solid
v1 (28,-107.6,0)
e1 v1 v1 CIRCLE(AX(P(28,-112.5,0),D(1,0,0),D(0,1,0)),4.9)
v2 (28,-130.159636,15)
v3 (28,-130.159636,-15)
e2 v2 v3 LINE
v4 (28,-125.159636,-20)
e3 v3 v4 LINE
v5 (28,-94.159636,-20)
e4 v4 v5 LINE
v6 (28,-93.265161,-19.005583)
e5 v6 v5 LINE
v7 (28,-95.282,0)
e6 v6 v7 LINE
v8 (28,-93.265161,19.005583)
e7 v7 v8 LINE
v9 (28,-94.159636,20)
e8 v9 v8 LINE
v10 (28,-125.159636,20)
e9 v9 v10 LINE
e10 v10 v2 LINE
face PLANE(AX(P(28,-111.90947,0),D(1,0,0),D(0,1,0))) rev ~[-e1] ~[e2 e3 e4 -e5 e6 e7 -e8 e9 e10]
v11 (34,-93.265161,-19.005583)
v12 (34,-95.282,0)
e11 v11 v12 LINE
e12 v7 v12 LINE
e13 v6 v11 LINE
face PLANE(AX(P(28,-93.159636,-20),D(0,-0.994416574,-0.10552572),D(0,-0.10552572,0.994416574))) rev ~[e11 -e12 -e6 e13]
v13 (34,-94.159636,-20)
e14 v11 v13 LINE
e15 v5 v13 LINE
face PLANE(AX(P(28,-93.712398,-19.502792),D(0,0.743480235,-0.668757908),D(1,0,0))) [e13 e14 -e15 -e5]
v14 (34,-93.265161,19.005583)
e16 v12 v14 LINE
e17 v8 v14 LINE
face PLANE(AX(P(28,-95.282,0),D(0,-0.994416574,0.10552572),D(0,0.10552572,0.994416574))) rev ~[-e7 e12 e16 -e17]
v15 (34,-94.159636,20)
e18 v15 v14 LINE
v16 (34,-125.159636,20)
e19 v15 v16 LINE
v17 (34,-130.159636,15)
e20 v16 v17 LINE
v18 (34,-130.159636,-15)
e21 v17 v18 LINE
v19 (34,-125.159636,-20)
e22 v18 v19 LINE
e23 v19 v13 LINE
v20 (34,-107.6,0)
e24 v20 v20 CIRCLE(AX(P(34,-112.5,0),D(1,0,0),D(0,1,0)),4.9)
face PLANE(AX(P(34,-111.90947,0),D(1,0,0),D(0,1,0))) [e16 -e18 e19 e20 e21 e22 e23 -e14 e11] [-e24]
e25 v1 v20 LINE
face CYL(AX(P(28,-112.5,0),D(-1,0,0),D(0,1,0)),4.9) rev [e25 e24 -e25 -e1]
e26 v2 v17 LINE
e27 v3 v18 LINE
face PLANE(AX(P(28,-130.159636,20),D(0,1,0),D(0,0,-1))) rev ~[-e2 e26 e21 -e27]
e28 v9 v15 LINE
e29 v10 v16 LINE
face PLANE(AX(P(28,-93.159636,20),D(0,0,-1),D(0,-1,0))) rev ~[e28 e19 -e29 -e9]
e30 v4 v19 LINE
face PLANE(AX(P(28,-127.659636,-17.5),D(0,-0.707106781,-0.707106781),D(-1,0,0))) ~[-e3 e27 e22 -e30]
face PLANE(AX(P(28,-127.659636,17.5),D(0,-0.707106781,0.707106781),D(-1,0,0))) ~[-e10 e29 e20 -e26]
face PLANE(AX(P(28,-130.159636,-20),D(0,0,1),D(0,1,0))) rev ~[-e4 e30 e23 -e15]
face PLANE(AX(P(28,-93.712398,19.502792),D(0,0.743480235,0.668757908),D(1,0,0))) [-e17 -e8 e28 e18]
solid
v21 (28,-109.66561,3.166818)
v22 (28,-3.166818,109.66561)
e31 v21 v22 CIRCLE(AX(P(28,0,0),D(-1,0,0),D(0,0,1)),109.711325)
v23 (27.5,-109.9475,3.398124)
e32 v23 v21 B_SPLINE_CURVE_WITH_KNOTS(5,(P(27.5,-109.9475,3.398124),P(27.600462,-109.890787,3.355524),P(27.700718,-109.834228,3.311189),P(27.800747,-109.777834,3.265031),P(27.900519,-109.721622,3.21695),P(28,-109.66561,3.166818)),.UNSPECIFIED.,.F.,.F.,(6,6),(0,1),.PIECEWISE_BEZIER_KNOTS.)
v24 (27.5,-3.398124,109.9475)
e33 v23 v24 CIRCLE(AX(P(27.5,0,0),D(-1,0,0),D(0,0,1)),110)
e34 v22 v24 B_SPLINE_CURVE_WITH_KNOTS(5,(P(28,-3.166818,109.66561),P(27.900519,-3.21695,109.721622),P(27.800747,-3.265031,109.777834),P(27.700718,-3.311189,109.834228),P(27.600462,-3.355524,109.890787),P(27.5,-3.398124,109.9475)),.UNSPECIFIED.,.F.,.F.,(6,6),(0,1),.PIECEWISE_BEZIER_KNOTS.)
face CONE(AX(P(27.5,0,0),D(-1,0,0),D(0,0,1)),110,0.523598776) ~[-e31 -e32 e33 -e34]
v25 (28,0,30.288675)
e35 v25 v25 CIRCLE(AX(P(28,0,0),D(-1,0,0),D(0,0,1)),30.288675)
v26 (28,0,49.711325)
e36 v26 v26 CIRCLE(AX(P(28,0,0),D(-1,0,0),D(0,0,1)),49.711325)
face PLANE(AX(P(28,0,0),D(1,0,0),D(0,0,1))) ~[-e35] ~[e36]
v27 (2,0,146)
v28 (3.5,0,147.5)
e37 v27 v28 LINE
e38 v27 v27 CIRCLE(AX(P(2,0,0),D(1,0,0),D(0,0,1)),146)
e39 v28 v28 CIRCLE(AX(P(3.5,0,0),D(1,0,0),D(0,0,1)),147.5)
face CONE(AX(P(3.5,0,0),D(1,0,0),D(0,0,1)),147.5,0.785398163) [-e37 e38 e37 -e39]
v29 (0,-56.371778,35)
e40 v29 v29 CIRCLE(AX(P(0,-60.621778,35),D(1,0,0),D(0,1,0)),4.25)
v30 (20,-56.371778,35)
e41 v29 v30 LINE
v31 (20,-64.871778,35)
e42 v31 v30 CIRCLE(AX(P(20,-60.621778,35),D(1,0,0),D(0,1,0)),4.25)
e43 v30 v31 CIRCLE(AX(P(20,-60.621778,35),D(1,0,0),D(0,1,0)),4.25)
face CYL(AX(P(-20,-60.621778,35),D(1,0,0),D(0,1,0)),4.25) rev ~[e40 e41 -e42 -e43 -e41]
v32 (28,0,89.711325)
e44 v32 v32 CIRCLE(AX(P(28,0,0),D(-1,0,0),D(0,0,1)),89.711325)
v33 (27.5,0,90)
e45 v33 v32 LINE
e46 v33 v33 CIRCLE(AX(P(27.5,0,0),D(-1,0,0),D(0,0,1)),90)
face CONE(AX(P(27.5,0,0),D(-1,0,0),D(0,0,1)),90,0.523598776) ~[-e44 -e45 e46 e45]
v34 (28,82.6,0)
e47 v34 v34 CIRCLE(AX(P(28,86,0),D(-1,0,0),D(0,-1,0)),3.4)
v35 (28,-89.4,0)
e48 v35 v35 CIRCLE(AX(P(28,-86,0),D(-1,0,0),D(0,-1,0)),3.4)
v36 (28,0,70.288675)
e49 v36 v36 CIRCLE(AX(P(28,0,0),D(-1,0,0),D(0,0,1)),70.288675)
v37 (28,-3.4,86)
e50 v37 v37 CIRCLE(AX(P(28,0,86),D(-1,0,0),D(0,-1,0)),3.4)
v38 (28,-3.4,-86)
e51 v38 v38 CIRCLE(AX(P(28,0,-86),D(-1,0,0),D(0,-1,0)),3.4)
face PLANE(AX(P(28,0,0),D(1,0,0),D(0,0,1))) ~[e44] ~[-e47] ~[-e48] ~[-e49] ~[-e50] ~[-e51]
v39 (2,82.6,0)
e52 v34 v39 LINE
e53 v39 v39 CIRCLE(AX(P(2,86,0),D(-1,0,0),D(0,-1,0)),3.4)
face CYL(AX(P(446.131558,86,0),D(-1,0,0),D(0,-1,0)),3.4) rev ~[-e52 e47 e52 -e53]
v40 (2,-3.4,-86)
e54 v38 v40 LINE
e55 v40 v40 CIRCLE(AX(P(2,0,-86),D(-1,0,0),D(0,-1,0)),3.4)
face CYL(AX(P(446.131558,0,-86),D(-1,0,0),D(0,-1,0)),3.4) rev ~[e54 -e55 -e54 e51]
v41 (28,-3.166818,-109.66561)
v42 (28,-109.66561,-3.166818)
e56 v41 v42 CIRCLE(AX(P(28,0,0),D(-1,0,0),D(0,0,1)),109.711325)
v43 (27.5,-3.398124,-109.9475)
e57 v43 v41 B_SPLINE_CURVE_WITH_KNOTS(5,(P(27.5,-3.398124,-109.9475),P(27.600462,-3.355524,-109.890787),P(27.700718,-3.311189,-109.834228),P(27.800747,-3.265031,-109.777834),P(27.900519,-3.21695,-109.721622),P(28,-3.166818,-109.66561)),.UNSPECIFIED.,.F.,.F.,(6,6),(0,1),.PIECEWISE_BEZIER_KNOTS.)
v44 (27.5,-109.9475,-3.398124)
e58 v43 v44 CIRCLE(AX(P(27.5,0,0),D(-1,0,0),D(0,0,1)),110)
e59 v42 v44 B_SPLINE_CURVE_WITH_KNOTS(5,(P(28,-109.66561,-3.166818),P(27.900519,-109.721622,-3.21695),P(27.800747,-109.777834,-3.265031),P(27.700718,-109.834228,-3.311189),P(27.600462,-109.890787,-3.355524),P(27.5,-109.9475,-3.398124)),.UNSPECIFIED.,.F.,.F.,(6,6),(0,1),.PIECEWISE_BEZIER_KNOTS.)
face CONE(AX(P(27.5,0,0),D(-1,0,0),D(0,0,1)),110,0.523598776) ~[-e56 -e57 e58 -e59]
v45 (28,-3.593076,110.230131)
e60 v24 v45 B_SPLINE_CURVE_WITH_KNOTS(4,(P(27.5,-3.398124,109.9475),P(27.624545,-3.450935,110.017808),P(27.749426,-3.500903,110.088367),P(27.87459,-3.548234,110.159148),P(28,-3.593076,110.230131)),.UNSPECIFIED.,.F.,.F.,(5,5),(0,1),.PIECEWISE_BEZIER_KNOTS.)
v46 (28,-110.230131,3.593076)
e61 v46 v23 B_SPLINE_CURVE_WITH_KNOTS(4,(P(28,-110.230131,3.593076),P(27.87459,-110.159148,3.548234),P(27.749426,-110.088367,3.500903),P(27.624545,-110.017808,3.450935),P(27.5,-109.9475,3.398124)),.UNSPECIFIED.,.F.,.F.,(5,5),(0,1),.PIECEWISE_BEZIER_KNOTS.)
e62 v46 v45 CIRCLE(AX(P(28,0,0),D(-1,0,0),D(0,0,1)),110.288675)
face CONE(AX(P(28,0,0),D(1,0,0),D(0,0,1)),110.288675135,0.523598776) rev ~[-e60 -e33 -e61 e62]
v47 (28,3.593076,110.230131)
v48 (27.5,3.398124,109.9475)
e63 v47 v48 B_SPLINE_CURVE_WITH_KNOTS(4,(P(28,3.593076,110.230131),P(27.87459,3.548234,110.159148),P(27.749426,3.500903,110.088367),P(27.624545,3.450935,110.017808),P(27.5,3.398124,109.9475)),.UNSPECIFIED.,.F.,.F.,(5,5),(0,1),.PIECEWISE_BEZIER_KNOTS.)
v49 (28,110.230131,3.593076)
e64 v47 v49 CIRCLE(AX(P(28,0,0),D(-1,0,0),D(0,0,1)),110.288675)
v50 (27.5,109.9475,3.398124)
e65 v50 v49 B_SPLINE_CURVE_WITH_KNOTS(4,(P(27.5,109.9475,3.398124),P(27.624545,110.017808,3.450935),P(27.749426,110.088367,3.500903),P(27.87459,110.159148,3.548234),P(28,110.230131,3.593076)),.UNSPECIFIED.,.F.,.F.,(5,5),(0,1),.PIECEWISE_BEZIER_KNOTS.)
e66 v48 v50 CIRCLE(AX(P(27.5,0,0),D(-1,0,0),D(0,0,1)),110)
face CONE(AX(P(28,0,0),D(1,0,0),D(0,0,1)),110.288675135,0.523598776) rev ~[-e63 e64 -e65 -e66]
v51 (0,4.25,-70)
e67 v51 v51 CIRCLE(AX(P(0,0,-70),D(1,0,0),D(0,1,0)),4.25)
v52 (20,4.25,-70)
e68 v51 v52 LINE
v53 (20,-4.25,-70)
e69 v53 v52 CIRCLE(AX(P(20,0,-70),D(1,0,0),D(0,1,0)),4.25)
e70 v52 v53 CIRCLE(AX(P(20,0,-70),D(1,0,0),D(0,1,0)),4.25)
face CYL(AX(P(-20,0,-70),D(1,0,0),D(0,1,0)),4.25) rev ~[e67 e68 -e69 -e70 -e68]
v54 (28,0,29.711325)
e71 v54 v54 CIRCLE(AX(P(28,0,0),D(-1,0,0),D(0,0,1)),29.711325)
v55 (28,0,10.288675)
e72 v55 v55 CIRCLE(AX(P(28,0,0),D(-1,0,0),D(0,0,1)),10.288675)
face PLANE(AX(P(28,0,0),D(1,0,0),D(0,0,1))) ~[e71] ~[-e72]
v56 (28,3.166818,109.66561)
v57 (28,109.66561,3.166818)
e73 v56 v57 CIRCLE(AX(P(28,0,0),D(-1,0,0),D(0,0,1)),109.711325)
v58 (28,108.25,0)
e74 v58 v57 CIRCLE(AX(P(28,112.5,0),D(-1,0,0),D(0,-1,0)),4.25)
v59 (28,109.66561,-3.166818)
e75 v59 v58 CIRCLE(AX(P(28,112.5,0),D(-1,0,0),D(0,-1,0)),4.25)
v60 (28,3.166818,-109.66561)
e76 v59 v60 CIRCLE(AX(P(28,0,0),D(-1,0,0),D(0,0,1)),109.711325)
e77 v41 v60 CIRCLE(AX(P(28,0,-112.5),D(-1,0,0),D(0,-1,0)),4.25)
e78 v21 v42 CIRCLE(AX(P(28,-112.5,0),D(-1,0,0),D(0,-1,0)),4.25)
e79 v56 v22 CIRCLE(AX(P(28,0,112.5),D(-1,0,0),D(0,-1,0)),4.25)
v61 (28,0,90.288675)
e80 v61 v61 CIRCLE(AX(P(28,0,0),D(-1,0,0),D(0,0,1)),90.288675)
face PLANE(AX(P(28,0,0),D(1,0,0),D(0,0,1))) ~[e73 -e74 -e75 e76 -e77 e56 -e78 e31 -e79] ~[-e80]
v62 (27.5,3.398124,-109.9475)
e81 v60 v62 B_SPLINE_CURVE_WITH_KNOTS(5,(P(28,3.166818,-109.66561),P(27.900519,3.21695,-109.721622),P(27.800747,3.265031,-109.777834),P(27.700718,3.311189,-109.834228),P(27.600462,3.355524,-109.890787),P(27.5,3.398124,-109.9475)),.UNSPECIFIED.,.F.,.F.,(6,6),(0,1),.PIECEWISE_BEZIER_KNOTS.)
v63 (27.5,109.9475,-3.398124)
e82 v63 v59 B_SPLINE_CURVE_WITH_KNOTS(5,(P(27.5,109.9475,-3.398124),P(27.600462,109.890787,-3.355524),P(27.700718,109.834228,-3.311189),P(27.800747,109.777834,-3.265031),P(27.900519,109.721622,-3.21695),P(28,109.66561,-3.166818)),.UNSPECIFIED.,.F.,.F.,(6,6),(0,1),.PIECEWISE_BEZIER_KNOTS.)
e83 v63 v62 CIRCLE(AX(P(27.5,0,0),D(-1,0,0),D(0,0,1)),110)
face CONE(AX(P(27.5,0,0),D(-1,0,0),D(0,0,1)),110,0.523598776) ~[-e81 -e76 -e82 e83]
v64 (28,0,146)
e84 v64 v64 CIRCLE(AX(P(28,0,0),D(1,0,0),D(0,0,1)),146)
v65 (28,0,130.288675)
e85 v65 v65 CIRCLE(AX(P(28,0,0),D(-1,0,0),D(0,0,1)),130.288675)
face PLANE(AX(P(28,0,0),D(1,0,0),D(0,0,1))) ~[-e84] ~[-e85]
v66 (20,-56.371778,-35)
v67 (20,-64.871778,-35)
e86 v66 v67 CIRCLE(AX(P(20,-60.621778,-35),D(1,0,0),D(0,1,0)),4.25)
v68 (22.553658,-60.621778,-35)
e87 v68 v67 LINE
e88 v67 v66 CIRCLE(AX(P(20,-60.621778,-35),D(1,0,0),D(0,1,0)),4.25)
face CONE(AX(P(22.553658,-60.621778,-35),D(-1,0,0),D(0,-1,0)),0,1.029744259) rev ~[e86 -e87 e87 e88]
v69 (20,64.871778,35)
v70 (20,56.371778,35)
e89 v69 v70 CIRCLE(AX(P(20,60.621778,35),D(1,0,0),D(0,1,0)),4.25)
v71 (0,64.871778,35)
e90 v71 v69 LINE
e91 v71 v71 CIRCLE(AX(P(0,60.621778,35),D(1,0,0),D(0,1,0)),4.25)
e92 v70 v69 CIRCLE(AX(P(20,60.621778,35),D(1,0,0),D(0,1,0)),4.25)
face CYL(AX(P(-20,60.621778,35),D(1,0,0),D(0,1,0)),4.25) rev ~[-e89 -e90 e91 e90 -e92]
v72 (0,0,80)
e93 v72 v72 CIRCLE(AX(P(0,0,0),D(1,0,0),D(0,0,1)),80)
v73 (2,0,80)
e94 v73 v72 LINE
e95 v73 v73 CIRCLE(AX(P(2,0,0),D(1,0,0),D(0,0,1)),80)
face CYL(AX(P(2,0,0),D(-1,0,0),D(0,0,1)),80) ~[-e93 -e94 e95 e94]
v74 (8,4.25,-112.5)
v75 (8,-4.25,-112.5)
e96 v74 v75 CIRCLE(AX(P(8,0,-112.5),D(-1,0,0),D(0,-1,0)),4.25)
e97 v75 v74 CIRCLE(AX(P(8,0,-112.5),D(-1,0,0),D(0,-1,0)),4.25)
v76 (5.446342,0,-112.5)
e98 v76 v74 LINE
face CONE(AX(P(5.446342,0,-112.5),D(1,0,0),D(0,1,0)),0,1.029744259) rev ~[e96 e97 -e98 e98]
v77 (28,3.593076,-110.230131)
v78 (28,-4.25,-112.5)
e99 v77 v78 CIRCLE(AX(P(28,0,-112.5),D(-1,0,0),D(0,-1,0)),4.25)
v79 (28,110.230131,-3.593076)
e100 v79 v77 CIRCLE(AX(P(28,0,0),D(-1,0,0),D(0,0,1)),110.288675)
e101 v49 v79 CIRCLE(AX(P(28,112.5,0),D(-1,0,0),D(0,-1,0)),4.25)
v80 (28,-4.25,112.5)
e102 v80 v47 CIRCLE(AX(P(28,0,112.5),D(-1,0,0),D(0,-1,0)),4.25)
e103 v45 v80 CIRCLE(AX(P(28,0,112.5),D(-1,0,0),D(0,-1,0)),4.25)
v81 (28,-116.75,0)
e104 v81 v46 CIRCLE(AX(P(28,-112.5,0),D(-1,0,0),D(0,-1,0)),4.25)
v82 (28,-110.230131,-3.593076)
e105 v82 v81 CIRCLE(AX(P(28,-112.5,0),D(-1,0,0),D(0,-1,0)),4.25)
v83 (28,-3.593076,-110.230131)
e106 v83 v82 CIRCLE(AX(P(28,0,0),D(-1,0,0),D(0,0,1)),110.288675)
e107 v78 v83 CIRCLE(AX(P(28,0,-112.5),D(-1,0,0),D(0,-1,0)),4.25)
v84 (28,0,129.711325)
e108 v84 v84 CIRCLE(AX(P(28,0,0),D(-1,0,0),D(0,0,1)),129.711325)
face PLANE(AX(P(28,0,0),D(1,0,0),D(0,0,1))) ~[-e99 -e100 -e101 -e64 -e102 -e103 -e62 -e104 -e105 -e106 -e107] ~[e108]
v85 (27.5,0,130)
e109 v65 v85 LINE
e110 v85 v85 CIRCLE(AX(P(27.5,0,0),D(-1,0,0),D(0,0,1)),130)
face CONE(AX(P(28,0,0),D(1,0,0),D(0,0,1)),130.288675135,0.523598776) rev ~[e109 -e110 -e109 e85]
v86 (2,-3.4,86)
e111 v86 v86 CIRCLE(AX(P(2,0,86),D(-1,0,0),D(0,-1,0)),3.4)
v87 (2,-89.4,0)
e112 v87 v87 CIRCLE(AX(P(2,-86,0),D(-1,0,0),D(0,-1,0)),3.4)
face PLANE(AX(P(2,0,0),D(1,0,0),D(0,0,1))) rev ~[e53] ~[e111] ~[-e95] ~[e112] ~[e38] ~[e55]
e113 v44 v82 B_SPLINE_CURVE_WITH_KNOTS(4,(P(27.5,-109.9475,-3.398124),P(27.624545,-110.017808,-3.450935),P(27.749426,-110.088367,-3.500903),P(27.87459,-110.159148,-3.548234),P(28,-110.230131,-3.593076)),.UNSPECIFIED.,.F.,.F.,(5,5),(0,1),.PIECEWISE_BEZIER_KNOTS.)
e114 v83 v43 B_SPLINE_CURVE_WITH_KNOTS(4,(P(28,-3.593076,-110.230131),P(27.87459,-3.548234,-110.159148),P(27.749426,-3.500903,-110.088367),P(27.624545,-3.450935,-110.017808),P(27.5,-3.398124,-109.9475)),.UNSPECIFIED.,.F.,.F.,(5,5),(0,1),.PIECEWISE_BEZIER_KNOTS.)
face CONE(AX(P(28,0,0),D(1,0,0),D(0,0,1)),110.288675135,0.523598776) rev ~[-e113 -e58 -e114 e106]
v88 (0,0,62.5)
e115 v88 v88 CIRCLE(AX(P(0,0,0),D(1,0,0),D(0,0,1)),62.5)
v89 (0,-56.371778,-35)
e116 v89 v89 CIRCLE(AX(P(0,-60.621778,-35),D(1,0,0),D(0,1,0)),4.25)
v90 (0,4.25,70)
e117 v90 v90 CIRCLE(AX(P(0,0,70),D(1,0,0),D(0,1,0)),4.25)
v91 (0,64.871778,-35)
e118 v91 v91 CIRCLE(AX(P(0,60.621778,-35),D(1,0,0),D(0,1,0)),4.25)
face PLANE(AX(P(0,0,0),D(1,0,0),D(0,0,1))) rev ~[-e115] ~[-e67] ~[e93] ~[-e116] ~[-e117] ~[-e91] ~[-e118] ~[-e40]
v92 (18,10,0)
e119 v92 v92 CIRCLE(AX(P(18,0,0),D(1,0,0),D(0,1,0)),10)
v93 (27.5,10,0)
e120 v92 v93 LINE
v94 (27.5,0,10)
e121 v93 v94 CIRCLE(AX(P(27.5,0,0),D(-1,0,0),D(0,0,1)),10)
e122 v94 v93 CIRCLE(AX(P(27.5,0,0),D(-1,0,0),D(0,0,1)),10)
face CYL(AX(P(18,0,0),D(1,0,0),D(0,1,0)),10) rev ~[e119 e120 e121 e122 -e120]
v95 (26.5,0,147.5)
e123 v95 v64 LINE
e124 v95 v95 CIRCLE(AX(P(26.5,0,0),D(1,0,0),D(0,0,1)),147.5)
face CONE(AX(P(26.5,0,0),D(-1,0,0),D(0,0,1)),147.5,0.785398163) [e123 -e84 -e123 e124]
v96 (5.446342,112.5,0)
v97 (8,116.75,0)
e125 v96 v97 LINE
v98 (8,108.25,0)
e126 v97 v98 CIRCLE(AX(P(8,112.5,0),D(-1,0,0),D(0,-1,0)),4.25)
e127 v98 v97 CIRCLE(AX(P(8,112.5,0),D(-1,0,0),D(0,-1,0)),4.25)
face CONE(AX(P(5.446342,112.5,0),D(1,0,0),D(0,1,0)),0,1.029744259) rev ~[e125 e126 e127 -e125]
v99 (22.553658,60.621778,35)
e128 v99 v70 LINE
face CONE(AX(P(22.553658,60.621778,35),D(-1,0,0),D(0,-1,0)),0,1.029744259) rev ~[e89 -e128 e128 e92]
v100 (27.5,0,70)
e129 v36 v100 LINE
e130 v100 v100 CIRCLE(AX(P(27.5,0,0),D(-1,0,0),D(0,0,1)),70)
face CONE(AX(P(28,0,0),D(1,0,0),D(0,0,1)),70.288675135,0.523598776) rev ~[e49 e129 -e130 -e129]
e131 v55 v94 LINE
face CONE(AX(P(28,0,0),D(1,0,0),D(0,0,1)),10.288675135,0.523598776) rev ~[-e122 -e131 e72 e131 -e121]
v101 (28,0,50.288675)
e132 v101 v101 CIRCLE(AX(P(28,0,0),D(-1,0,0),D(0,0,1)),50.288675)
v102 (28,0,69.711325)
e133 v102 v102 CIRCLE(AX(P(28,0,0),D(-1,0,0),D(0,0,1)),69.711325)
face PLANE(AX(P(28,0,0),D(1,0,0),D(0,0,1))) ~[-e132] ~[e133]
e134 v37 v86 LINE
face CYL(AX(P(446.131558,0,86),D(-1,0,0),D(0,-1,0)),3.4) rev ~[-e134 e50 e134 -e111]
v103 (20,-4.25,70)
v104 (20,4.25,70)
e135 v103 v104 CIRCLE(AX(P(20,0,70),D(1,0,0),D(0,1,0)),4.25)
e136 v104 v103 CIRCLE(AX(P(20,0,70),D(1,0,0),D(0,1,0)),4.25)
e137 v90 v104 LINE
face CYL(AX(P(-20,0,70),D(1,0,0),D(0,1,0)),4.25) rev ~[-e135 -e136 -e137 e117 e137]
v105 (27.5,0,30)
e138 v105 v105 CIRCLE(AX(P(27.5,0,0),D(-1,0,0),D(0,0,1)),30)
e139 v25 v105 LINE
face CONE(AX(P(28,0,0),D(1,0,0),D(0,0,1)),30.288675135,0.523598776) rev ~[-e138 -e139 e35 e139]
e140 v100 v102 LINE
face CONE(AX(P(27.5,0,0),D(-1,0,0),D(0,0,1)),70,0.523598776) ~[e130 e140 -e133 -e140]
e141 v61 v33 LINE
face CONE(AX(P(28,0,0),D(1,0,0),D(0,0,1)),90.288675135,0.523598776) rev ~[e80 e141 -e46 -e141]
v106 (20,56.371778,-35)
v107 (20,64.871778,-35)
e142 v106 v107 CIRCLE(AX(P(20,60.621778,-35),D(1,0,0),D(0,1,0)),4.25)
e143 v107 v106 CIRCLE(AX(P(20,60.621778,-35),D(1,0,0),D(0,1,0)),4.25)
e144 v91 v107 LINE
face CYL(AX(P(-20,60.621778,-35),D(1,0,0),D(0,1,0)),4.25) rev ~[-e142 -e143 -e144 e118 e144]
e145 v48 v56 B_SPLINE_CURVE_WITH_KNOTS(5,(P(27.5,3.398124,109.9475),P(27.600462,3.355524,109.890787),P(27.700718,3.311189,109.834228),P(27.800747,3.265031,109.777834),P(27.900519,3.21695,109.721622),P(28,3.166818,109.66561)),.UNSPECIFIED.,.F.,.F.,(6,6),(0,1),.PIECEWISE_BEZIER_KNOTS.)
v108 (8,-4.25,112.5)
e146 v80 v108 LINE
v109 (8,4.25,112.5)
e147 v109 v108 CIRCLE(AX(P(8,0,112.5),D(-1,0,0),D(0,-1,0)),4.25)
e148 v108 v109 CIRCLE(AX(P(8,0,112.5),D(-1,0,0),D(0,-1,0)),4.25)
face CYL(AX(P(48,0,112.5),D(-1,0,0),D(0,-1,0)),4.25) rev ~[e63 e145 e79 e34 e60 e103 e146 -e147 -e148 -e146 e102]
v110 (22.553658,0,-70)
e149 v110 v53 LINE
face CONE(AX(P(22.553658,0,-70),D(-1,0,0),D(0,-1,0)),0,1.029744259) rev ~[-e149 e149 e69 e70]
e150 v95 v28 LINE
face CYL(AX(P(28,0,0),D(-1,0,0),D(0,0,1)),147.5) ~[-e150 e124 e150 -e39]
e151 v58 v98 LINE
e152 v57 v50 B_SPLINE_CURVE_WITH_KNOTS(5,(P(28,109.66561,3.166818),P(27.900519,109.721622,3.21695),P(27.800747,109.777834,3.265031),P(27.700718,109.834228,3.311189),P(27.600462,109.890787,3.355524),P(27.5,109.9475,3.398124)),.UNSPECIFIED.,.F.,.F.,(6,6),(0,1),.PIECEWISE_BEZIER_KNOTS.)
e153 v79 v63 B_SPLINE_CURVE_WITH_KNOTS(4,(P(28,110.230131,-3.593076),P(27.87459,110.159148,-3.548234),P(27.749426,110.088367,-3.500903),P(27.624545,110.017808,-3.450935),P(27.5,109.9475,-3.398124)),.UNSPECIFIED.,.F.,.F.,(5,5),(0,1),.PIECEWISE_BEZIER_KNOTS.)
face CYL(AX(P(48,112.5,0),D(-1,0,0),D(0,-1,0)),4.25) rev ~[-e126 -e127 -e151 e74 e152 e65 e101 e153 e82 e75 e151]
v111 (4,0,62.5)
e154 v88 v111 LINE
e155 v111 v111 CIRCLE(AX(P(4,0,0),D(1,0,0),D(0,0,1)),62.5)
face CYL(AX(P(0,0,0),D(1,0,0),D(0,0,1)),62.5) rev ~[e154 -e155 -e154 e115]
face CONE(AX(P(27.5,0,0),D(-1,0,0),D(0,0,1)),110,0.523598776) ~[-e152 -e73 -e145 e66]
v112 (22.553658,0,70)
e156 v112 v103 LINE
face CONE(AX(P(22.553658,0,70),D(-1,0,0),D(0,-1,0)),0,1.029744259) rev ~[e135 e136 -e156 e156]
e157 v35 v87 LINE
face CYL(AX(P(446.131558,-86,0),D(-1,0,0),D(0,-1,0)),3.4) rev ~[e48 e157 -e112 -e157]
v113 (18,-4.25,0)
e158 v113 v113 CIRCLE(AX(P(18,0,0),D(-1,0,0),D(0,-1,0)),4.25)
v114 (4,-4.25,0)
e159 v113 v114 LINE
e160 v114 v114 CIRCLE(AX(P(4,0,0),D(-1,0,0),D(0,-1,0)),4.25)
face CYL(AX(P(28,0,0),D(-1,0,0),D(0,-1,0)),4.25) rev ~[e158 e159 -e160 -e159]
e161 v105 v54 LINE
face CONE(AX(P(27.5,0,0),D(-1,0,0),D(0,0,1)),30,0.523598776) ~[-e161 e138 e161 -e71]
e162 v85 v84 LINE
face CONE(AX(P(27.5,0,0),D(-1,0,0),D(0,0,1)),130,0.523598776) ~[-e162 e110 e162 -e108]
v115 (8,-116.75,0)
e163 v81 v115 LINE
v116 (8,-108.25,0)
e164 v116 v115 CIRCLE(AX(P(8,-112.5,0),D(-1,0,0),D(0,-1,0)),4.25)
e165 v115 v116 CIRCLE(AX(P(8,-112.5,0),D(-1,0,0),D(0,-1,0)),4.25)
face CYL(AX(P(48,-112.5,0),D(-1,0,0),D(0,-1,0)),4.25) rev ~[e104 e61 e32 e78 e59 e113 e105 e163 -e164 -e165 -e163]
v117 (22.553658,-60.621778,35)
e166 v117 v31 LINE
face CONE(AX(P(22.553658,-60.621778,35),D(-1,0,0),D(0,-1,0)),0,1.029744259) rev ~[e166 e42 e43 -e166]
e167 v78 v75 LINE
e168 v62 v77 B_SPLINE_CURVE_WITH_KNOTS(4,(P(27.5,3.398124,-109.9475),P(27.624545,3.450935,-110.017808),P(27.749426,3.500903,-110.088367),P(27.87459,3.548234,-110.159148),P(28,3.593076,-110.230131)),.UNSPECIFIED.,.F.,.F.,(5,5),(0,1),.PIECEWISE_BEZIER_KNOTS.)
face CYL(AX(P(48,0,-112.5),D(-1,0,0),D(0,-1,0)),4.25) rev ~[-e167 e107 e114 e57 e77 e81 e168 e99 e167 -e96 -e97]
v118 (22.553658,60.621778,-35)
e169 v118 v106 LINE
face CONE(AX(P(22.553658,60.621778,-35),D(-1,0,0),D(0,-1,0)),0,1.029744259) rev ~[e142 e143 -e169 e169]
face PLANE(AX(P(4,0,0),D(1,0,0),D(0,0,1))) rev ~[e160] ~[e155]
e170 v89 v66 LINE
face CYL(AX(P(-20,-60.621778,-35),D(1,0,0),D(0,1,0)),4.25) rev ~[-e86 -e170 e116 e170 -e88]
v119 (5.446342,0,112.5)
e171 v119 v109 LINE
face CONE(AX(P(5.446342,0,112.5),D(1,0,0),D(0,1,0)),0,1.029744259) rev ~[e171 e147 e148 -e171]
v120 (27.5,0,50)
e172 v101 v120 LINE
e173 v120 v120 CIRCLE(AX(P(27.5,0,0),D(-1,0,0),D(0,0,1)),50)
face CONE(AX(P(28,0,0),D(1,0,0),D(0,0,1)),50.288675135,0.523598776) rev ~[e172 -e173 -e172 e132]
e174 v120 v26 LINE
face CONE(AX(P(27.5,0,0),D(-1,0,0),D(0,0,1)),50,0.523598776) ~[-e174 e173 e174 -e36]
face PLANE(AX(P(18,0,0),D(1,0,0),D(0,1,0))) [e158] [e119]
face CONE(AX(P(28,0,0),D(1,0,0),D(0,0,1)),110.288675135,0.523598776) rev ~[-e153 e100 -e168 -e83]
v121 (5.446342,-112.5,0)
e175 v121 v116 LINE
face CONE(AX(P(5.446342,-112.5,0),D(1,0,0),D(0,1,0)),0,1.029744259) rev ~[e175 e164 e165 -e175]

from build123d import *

# Parameters (mm, degrees)
F3_D            = 8.5
F3_DEPTH        = 20
F3_TIP          = 2.5536576309
F6_SIZE         = 1.5
F8_D            = 6.8
F10_D           = 8.5
F10_CBORE_D     = 20
F10_CBORE_DEPTH = 10
F12_D           = 8.5
F12_DEPTH       = 20
F12_TIP         = 2.5536576309
F13_R           = 4.9
F14_DEPTH       = 6
F15_SIZE        = 5
F16_SIZE        = 1


with BuildPart() as f1:
    # F0 (on Front) → F1 (revolve)
    with BuildSketch(Plane.XZ):
        Polygon((0, 80), (0, 62.5), (4, 62.5), (4, 0), (28, 0), (28, 147.5), (2, 147.5), (2, 80), align=None)
    revolve(axis=Axis((16, 0, 0), (1, 0, 0)))

    # F3
    with Locations(Plane(origin=(0, 0, 0), x_dir=(0, -1, 0), z_dir=(-1, 0, 0))):
        with Locations((0, 70), (60.6217782649, 35), (60.6217782649, -35), (0, -70), (-60.6217782649, -35), (-60.6217782649, 35)):
            Hole(F3_D / 2, depth=F3_DEPTH)
            with Locations((0, 0, -(F3_DEPTH + F3_TIP / 2))):  # 118° drill point
                Cone(0, F3_D / 2, F3_TIP, mode=Mode.SUBTRACT)

    # F4 (on Front) → F5 (revolve, cut)
    with BuildSketch(Plane.XZ):
        Polygon((28, 9.7113248654), (28, 10.2886751346), (27.5, 10), align=None)
        Polygon((28, 29.7113248654), (28, 30.2886751346), (27.5, 30), align=None)
        Polygon((28, 49.7113248654), (28, 50.2886751346), (27.5, 50), align=None)
        Polygon((28, 69.7113248654), (28, 70.2886751346), (27.5, 70), align=None)
        Polygon((28, 89.7113248654), (28, 90.2886751346), (27.5, 90), align=None)
        Polygon((28, 109.7113248654), (28, 110.2886751346), (27.5, 110), align=None)
        Polygon((28, 129.7113248654), (28, 130.2886751346), (27.5, 130), align=None)
        Polygon((28, 149.7113248654), (28, 150.2886751346), (27.5, 150), align=None)
        Polygon((28, 169.7113248654), (28, 170.2886751346), (27.5, 170), align=None)
        Polygon((28, 189.7113248654), (28, 190.2886751346), (27.5, 190), align=None)
        Polygon((28, 209.7113248654), (28, 210.2886751346), (27.5, 210), align=None)
        Polygon((28, 229.7113248654), (28, 230.2886751346), (27.5, 230), align=None)
        Polygon((28, 249.7113248654), (28, 250.2886751346), (27.5, 250), align=None)
        Polygon((28, 269.7113248654), (28, 270.2886751346), (27.5, 270), align=None)
    revolve(axis=Axis((14, 0, 0), (-1, 0, 0)), mode=Mode.SUBTRACT)

    # F6
    f6_edges = [f1.edges().sort_by_distance(p)[0] for p in [
        (28, 0, -147.5),
        (2, 0, -147.5),
    ]]
    chamfer(f6_edges, length=F6_SIZE)

    # F8 (through all)
    with Locations(Plane.YZ.offset(28)):
        with Locations((0, 86), (86, 0), (0, -86), (-86, 0)):
            Hole(F8_D / 2)

    # F10 (through all)
    with Locations(Plane.YZ.offset(28)):
        with Locations((0, 0)):
            CounterBoreHole(F10_D / 2, F10_CBORE_D / 2, F10_CBORE_DEPTH)

    # F12
    with Locations(Plane.YZ.offset(28)):
        with Locations((0, 112.5), (112.5, 0), (0, -112.5), (-112.5, 0)):
            Hole(F12_D / 2, depth=F12_DEPTH)
            with Locations((0, 0, -(F12_DEPTH + F12_TIP / 2))):  # 118° drill point
                Cone(0, F12_D / 2, F12_TIP, mode=Mode.SUBTRACT)


with BuildPart() as f14:
    # F13 (on face) → F14 (new body)
    with BuildSketch(Plane.YZ.offset(28)):
        Polygon((-93.1596355268, 20), (-130.1596355268, 20), (-130.1596355268, -20), (-93.1596355268, -20), (-95.282, 0), align=None)
        with Locations((-112.5, 0)):
            Circle(F13_R, mode=Mode.SUBTRACT)
    extrude(amount=F14_DEPTH)

    # F15
    f15_edges = [f14.edges().sort_by_distance(p)[0] for p in [
        (31, -130.159636, 20),
        (31, -130.159636, -20),
    ]]
    chamfer(f15_edges, length=F15_SIZE)

    # F16
    f16_edges = [f14.edges().sort_by_distance(p)[0] for p in [
        (31, -93.159636, 20),
        (31, -93.159636, -20),
    ]]
    chamfer(f16_edges, length=F16_SIZE)


solid = Compound([f1.part, f14.part])
